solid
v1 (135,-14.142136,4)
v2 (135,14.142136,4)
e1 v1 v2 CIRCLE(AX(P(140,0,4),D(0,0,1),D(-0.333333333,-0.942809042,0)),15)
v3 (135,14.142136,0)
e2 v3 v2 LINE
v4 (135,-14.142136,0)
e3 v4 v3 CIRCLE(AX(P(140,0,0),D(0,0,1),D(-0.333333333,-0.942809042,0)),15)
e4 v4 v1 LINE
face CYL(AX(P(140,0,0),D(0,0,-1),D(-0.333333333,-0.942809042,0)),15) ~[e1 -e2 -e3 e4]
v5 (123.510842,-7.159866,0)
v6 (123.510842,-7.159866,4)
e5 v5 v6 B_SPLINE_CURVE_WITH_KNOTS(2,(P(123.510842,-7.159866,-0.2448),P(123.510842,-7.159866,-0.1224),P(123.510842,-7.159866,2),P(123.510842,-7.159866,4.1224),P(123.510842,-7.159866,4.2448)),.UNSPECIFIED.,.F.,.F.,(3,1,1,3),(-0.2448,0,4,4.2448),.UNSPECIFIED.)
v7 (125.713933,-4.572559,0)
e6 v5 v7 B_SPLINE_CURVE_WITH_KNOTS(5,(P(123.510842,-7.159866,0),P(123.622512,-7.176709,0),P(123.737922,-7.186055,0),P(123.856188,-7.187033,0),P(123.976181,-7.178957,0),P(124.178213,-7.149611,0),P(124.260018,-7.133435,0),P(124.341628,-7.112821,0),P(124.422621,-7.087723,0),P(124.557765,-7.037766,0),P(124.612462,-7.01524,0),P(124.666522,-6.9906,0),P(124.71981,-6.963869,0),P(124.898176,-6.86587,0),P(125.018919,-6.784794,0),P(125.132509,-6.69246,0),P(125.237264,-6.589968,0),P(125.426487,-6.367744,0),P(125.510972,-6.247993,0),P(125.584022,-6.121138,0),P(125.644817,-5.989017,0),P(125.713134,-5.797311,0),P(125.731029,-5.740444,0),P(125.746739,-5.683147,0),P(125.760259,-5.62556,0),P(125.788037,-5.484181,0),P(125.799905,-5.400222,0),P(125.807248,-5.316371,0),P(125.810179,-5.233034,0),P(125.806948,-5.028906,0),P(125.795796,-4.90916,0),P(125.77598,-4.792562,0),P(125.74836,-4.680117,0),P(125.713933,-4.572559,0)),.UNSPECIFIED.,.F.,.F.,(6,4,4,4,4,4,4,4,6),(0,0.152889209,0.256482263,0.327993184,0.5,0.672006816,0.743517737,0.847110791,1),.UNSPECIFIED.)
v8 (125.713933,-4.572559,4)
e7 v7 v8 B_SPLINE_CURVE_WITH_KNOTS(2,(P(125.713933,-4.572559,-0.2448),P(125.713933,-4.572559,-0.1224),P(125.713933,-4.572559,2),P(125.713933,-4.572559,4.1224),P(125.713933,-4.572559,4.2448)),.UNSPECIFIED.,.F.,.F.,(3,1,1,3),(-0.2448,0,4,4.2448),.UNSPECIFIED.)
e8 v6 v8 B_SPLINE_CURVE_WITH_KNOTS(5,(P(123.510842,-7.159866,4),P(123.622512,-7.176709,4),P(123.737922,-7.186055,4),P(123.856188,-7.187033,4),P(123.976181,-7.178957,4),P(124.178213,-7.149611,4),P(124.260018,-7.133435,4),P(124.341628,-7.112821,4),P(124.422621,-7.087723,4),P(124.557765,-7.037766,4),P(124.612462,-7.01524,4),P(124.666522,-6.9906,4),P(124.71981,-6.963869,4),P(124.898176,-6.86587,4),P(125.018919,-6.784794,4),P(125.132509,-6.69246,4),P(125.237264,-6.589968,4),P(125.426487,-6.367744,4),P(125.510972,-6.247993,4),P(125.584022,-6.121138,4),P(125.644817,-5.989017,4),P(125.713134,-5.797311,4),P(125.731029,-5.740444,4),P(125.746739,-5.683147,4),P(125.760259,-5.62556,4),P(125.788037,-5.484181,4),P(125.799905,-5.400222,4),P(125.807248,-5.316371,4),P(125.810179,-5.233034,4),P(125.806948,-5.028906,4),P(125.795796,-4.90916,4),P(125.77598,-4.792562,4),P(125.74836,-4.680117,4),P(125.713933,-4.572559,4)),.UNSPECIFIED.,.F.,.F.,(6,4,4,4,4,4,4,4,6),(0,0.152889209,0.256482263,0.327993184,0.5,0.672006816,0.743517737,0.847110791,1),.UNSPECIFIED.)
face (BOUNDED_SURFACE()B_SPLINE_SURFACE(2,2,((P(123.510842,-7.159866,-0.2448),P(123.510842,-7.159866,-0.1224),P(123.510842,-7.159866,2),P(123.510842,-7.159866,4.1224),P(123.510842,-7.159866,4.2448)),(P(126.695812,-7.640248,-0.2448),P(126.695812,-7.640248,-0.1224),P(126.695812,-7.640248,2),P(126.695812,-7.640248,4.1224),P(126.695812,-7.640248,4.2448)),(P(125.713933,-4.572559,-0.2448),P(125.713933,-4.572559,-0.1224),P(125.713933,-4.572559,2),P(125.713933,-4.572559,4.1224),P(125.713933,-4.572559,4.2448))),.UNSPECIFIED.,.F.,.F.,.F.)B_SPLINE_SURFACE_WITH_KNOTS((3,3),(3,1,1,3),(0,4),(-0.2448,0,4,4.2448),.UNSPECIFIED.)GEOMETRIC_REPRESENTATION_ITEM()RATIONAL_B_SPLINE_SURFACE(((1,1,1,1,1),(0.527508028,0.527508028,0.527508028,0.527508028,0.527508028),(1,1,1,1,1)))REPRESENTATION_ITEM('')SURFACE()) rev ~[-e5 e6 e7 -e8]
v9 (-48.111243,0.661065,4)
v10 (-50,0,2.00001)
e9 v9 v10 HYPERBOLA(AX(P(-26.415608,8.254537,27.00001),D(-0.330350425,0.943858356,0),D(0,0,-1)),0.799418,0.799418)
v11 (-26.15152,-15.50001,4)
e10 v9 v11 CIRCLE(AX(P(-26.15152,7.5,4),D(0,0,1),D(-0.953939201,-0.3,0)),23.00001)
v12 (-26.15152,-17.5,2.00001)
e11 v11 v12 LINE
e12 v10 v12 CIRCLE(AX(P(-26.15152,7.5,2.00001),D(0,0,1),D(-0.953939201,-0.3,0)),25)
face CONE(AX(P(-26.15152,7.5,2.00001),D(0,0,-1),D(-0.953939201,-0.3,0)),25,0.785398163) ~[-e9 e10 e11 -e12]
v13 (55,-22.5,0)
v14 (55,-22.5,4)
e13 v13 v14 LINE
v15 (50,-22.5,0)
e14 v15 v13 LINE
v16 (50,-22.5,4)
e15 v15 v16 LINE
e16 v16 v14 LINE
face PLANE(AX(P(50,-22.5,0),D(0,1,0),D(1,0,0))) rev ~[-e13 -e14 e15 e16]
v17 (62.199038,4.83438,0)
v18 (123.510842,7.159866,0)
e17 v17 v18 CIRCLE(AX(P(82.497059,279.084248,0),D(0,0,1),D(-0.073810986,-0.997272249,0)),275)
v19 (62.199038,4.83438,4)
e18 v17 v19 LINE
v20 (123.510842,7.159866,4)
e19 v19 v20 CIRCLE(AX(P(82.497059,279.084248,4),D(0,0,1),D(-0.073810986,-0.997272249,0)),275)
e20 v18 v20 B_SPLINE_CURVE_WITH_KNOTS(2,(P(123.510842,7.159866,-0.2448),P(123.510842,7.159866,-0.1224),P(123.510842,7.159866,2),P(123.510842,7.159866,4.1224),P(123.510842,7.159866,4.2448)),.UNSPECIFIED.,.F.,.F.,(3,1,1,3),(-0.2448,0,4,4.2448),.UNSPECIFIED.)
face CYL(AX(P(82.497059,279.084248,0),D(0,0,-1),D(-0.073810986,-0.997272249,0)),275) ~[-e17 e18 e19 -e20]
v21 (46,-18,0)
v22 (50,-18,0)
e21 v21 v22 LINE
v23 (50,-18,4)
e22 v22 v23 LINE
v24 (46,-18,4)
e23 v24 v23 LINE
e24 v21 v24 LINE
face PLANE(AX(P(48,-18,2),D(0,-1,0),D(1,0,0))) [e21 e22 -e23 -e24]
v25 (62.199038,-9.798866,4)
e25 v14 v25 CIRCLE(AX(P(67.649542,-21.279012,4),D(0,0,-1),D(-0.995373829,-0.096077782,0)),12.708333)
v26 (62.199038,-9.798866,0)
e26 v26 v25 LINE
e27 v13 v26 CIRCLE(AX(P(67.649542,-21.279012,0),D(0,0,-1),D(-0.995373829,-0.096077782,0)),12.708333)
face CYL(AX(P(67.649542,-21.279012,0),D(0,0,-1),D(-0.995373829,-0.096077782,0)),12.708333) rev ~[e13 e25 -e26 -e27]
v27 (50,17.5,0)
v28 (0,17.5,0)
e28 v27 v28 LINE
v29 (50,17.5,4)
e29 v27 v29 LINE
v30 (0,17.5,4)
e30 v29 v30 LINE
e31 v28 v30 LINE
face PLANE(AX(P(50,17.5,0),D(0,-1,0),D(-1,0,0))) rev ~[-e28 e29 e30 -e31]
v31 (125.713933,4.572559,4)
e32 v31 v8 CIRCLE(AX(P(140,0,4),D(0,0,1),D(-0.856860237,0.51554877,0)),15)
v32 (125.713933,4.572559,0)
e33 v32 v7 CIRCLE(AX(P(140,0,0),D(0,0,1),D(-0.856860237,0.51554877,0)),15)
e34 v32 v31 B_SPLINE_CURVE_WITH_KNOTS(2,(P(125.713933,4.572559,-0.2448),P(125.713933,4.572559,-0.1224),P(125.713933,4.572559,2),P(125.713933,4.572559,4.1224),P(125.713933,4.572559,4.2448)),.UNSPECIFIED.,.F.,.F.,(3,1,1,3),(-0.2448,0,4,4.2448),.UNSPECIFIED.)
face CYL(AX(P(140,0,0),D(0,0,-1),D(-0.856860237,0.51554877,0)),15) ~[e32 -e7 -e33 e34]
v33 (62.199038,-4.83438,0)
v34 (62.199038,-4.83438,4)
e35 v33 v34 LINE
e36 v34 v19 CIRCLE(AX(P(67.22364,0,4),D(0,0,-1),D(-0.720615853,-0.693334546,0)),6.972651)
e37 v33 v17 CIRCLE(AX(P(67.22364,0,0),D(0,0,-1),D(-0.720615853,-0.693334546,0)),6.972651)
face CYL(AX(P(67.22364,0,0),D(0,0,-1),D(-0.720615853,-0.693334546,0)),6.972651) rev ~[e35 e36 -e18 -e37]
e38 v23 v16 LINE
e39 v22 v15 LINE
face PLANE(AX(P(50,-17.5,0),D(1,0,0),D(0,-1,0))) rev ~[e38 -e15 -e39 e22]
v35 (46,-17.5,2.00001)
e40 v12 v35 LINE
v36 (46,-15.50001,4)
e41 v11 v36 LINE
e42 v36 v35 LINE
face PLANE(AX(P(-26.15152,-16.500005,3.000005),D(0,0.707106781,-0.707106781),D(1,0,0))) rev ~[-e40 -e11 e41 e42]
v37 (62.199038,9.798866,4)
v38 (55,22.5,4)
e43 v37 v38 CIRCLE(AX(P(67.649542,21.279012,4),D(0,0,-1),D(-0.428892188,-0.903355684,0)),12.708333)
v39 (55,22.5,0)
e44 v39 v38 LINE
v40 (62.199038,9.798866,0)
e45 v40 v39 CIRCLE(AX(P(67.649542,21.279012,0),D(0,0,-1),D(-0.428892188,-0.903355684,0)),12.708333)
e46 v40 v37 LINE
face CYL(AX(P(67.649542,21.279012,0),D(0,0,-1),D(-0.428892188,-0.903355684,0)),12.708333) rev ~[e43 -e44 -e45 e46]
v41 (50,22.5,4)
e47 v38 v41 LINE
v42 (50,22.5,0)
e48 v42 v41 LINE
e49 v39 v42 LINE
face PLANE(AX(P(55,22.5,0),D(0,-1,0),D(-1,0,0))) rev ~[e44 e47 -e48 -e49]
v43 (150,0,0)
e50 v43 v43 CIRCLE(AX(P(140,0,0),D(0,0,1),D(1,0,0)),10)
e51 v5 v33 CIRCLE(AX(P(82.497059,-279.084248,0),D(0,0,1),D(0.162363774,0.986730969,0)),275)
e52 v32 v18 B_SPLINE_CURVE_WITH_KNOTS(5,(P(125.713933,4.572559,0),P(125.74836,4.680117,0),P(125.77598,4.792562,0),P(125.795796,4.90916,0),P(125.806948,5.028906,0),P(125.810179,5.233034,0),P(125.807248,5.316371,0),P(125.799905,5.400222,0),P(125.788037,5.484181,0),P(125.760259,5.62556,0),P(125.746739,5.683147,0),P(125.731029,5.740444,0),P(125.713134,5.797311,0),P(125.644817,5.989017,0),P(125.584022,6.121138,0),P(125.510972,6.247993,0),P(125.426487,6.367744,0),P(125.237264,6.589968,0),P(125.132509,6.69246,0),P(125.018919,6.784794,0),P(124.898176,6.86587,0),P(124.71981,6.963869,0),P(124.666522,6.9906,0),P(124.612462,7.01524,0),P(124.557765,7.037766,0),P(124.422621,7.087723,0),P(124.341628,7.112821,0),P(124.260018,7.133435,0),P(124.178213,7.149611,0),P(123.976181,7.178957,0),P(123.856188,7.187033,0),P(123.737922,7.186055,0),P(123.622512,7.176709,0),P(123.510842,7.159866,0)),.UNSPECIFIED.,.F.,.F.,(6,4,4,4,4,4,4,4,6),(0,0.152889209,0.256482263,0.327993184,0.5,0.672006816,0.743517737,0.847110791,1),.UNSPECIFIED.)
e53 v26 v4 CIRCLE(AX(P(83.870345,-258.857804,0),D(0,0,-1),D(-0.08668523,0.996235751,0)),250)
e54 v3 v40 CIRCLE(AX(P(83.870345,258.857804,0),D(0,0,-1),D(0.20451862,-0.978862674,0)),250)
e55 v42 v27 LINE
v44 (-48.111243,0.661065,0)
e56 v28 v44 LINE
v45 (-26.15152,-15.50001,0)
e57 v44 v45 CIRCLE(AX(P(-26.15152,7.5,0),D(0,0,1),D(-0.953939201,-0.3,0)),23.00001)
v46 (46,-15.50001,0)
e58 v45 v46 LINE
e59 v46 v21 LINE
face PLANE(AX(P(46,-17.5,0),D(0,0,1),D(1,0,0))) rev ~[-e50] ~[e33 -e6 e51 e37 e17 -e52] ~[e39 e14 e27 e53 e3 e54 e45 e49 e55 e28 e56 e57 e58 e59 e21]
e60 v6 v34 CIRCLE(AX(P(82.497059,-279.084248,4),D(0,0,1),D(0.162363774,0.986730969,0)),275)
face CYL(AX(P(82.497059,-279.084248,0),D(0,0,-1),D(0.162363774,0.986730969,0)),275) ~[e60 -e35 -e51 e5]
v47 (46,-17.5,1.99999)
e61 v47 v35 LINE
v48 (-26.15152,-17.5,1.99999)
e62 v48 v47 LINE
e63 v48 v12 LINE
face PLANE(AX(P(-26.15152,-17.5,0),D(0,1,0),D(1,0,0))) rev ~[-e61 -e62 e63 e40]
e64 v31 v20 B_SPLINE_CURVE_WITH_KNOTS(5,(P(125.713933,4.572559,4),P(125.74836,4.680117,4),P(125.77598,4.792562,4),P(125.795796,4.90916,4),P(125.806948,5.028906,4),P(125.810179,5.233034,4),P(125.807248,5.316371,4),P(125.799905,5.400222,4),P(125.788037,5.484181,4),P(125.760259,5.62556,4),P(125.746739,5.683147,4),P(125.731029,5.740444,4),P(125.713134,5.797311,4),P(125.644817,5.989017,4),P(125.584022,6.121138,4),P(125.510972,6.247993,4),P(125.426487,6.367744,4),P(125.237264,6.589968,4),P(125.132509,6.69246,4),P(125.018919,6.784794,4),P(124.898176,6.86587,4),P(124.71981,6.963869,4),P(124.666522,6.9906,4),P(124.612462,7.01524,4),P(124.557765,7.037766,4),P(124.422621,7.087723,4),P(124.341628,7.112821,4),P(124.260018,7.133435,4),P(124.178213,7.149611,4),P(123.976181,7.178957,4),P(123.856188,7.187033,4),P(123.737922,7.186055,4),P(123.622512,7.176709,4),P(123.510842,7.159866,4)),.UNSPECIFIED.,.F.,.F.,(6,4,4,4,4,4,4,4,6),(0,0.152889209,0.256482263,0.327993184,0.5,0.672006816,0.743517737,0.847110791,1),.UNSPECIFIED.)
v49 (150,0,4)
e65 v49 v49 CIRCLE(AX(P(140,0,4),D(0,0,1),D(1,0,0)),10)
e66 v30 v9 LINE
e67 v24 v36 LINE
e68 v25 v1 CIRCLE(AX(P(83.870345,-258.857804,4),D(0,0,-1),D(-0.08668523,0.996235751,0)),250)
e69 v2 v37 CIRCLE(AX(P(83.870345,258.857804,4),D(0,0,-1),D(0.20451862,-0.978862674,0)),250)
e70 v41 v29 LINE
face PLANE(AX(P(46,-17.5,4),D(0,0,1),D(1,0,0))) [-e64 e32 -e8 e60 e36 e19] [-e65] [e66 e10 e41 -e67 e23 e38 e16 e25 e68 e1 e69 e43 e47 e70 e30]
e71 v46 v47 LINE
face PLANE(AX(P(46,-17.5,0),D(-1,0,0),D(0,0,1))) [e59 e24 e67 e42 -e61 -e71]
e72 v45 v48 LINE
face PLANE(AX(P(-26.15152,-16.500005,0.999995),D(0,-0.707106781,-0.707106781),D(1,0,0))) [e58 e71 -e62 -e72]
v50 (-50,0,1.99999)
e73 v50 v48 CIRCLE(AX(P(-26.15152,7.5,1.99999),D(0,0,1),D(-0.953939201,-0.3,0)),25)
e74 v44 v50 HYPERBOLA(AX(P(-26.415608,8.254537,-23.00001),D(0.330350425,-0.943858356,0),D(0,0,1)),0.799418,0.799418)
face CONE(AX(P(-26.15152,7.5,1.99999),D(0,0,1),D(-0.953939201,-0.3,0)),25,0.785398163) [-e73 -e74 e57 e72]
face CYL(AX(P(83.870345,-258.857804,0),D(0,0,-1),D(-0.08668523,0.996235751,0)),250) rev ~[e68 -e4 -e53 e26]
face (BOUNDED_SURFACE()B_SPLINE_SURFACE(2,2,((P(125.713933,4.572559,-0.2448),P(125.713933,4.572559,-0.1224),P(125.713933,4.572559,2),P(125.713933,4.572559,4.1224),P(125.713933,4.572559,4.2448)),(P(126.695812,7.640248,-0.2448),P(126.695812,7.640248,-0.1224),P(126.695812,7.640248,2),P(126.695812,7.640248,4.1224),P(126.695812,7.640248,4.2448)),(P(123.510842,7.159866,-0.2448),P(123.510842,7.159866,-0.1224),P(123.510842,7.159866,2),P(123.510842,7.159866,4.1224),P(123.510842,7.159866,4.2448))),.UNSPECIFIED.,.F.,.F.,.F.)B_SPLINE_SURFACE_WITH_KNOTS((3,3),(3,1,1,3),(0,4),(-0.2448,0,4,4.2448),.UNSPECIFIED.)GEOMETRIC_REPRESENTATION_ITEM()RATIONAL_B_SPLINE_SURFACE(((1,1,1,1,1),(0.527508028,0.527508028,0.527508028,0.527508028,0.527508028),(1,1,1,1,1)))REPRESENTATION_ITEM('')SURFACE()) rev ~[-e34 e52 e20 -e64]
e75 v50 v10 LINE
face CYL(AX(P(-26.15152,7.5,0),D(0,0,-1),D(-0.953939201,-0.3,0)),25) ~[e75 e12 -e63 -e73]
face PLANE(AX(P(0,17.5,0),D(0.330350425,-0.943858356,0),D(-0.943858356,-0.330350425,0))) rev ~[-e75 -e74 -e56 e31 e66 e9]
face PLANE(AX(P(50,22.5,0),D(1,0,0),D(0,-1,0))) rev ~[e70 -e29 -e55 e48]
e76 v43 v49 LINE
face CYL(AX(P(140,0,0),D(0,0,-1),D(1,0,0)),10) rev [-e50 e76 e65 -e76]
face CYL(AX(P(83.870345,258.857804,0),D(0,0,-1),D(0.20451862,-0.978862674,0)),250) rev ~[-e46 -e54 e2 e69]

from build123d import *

# Parameters (mm, degrees)
F0_R     = 10
F1_DEPTH = 4
F2_R     = 2
F3_W     = 4
F3_H     = 4
F4_DEPTH = 0.5
F5_SIZE  = 1.99999


# Not quite as in the source:
# - a fillet or chamfer is up to 0.001 mm smaller than in the source, because OpenCascade refuses the exact size


with BuildPart() as f1:
    # F0 (on Top) → F1 (new body)
    with BuildSketch(Plane.XY):
        with BuildLine():
            Line((50, 22.5), (50, 17.5))
            Line((50, 17.5), (0, 17.5))
            Line((0, 17.5), (-50, 0))
            ThreePointArc((-50, 0), (-40.9417194223, -12.6556443707), (-26.1515199646, -17.5))
            Line((-26.1515199646, -17.5), (50, -17.5))
            Line((50, -17.5), (50, -22.5))
            Line((50, -22.5), (55, -22.5))
            ThreePointArc((55, -22.5), (56.5936558821, -15.0125045804), (62.1990375221, -9.7988663689))
            ThreePointArc((62.1990375221, -9.7988663689), (98.7587484272, -9.3015269429), (135, -14.1421356237))
            ThreePointArc((135, -14.1421356237), (155, 0), (135, 14.1421356237))
            ThreePointArc((135, 14.1421356237), (98.7587484272, 9.3015269429), (62.1990375221, 9.7988663689))
            ThreePointArc((62.1990375221, 9.7988663689), (56.5936558821, 15.0125045804), (55, 22.5))
            Line((55, 22.5), (50, 22.5))
        make_face()
        with BuildLine():
            ThreePointArc((62.1990375221, -4.8343795659), (60.2509894701, 0), (62.1990375221, 4.8343795659))
            ThreePointArc((62.1990375221, 4.8343795659), (94.7590329876, 4.3577585856), (127.1470964452, 7.7332315503))
            ThreePointArc((127.1470964452, 7.7332315503), (125, 0), (127.1470964452, -7.7332315503))
            ThreePointArc((127.1470964452, -7.7332315503), (94.7590329876, -4.3577585856), (62.1990375221, -4.8343795659))
        make_face(mode=Mode.SUBTRACT)
        with Locations((140, 0)):
            Circle(F0_R, mode=Mode.SUBTRACT)
    extrude(amount=F1_DEPTH)

    # F2
    f2_edges = [f1.edges().sort_by_distance(p)[0] for p in [
        (127.147096, 7.733232, 2),
        (127.147096, -7.733232, 2),
    ]]
    fillet(f2_edges, radius=F2_R)

    # F3 (on face) → F4 (join)
    with BuildSketch(Plane.XZ.offset(17.5)):
        with Locations((48, 2)):
            Rectangle(F3_W, F3_H)
    extrude(amount=F4_DEPTH)

    # F5 (size 2 in the source; OpenCascade refuses exactly that, so slightly less here)
    f5_edges = [f1.edges().sort_by_distance(p)[0] for p in [
        (9.92424, -17.5, 4),
        (9.92424, -17.5, 0),
    ]]
    chamfer(f5_edges, length=F5_SIZE)


solid = f1.part
